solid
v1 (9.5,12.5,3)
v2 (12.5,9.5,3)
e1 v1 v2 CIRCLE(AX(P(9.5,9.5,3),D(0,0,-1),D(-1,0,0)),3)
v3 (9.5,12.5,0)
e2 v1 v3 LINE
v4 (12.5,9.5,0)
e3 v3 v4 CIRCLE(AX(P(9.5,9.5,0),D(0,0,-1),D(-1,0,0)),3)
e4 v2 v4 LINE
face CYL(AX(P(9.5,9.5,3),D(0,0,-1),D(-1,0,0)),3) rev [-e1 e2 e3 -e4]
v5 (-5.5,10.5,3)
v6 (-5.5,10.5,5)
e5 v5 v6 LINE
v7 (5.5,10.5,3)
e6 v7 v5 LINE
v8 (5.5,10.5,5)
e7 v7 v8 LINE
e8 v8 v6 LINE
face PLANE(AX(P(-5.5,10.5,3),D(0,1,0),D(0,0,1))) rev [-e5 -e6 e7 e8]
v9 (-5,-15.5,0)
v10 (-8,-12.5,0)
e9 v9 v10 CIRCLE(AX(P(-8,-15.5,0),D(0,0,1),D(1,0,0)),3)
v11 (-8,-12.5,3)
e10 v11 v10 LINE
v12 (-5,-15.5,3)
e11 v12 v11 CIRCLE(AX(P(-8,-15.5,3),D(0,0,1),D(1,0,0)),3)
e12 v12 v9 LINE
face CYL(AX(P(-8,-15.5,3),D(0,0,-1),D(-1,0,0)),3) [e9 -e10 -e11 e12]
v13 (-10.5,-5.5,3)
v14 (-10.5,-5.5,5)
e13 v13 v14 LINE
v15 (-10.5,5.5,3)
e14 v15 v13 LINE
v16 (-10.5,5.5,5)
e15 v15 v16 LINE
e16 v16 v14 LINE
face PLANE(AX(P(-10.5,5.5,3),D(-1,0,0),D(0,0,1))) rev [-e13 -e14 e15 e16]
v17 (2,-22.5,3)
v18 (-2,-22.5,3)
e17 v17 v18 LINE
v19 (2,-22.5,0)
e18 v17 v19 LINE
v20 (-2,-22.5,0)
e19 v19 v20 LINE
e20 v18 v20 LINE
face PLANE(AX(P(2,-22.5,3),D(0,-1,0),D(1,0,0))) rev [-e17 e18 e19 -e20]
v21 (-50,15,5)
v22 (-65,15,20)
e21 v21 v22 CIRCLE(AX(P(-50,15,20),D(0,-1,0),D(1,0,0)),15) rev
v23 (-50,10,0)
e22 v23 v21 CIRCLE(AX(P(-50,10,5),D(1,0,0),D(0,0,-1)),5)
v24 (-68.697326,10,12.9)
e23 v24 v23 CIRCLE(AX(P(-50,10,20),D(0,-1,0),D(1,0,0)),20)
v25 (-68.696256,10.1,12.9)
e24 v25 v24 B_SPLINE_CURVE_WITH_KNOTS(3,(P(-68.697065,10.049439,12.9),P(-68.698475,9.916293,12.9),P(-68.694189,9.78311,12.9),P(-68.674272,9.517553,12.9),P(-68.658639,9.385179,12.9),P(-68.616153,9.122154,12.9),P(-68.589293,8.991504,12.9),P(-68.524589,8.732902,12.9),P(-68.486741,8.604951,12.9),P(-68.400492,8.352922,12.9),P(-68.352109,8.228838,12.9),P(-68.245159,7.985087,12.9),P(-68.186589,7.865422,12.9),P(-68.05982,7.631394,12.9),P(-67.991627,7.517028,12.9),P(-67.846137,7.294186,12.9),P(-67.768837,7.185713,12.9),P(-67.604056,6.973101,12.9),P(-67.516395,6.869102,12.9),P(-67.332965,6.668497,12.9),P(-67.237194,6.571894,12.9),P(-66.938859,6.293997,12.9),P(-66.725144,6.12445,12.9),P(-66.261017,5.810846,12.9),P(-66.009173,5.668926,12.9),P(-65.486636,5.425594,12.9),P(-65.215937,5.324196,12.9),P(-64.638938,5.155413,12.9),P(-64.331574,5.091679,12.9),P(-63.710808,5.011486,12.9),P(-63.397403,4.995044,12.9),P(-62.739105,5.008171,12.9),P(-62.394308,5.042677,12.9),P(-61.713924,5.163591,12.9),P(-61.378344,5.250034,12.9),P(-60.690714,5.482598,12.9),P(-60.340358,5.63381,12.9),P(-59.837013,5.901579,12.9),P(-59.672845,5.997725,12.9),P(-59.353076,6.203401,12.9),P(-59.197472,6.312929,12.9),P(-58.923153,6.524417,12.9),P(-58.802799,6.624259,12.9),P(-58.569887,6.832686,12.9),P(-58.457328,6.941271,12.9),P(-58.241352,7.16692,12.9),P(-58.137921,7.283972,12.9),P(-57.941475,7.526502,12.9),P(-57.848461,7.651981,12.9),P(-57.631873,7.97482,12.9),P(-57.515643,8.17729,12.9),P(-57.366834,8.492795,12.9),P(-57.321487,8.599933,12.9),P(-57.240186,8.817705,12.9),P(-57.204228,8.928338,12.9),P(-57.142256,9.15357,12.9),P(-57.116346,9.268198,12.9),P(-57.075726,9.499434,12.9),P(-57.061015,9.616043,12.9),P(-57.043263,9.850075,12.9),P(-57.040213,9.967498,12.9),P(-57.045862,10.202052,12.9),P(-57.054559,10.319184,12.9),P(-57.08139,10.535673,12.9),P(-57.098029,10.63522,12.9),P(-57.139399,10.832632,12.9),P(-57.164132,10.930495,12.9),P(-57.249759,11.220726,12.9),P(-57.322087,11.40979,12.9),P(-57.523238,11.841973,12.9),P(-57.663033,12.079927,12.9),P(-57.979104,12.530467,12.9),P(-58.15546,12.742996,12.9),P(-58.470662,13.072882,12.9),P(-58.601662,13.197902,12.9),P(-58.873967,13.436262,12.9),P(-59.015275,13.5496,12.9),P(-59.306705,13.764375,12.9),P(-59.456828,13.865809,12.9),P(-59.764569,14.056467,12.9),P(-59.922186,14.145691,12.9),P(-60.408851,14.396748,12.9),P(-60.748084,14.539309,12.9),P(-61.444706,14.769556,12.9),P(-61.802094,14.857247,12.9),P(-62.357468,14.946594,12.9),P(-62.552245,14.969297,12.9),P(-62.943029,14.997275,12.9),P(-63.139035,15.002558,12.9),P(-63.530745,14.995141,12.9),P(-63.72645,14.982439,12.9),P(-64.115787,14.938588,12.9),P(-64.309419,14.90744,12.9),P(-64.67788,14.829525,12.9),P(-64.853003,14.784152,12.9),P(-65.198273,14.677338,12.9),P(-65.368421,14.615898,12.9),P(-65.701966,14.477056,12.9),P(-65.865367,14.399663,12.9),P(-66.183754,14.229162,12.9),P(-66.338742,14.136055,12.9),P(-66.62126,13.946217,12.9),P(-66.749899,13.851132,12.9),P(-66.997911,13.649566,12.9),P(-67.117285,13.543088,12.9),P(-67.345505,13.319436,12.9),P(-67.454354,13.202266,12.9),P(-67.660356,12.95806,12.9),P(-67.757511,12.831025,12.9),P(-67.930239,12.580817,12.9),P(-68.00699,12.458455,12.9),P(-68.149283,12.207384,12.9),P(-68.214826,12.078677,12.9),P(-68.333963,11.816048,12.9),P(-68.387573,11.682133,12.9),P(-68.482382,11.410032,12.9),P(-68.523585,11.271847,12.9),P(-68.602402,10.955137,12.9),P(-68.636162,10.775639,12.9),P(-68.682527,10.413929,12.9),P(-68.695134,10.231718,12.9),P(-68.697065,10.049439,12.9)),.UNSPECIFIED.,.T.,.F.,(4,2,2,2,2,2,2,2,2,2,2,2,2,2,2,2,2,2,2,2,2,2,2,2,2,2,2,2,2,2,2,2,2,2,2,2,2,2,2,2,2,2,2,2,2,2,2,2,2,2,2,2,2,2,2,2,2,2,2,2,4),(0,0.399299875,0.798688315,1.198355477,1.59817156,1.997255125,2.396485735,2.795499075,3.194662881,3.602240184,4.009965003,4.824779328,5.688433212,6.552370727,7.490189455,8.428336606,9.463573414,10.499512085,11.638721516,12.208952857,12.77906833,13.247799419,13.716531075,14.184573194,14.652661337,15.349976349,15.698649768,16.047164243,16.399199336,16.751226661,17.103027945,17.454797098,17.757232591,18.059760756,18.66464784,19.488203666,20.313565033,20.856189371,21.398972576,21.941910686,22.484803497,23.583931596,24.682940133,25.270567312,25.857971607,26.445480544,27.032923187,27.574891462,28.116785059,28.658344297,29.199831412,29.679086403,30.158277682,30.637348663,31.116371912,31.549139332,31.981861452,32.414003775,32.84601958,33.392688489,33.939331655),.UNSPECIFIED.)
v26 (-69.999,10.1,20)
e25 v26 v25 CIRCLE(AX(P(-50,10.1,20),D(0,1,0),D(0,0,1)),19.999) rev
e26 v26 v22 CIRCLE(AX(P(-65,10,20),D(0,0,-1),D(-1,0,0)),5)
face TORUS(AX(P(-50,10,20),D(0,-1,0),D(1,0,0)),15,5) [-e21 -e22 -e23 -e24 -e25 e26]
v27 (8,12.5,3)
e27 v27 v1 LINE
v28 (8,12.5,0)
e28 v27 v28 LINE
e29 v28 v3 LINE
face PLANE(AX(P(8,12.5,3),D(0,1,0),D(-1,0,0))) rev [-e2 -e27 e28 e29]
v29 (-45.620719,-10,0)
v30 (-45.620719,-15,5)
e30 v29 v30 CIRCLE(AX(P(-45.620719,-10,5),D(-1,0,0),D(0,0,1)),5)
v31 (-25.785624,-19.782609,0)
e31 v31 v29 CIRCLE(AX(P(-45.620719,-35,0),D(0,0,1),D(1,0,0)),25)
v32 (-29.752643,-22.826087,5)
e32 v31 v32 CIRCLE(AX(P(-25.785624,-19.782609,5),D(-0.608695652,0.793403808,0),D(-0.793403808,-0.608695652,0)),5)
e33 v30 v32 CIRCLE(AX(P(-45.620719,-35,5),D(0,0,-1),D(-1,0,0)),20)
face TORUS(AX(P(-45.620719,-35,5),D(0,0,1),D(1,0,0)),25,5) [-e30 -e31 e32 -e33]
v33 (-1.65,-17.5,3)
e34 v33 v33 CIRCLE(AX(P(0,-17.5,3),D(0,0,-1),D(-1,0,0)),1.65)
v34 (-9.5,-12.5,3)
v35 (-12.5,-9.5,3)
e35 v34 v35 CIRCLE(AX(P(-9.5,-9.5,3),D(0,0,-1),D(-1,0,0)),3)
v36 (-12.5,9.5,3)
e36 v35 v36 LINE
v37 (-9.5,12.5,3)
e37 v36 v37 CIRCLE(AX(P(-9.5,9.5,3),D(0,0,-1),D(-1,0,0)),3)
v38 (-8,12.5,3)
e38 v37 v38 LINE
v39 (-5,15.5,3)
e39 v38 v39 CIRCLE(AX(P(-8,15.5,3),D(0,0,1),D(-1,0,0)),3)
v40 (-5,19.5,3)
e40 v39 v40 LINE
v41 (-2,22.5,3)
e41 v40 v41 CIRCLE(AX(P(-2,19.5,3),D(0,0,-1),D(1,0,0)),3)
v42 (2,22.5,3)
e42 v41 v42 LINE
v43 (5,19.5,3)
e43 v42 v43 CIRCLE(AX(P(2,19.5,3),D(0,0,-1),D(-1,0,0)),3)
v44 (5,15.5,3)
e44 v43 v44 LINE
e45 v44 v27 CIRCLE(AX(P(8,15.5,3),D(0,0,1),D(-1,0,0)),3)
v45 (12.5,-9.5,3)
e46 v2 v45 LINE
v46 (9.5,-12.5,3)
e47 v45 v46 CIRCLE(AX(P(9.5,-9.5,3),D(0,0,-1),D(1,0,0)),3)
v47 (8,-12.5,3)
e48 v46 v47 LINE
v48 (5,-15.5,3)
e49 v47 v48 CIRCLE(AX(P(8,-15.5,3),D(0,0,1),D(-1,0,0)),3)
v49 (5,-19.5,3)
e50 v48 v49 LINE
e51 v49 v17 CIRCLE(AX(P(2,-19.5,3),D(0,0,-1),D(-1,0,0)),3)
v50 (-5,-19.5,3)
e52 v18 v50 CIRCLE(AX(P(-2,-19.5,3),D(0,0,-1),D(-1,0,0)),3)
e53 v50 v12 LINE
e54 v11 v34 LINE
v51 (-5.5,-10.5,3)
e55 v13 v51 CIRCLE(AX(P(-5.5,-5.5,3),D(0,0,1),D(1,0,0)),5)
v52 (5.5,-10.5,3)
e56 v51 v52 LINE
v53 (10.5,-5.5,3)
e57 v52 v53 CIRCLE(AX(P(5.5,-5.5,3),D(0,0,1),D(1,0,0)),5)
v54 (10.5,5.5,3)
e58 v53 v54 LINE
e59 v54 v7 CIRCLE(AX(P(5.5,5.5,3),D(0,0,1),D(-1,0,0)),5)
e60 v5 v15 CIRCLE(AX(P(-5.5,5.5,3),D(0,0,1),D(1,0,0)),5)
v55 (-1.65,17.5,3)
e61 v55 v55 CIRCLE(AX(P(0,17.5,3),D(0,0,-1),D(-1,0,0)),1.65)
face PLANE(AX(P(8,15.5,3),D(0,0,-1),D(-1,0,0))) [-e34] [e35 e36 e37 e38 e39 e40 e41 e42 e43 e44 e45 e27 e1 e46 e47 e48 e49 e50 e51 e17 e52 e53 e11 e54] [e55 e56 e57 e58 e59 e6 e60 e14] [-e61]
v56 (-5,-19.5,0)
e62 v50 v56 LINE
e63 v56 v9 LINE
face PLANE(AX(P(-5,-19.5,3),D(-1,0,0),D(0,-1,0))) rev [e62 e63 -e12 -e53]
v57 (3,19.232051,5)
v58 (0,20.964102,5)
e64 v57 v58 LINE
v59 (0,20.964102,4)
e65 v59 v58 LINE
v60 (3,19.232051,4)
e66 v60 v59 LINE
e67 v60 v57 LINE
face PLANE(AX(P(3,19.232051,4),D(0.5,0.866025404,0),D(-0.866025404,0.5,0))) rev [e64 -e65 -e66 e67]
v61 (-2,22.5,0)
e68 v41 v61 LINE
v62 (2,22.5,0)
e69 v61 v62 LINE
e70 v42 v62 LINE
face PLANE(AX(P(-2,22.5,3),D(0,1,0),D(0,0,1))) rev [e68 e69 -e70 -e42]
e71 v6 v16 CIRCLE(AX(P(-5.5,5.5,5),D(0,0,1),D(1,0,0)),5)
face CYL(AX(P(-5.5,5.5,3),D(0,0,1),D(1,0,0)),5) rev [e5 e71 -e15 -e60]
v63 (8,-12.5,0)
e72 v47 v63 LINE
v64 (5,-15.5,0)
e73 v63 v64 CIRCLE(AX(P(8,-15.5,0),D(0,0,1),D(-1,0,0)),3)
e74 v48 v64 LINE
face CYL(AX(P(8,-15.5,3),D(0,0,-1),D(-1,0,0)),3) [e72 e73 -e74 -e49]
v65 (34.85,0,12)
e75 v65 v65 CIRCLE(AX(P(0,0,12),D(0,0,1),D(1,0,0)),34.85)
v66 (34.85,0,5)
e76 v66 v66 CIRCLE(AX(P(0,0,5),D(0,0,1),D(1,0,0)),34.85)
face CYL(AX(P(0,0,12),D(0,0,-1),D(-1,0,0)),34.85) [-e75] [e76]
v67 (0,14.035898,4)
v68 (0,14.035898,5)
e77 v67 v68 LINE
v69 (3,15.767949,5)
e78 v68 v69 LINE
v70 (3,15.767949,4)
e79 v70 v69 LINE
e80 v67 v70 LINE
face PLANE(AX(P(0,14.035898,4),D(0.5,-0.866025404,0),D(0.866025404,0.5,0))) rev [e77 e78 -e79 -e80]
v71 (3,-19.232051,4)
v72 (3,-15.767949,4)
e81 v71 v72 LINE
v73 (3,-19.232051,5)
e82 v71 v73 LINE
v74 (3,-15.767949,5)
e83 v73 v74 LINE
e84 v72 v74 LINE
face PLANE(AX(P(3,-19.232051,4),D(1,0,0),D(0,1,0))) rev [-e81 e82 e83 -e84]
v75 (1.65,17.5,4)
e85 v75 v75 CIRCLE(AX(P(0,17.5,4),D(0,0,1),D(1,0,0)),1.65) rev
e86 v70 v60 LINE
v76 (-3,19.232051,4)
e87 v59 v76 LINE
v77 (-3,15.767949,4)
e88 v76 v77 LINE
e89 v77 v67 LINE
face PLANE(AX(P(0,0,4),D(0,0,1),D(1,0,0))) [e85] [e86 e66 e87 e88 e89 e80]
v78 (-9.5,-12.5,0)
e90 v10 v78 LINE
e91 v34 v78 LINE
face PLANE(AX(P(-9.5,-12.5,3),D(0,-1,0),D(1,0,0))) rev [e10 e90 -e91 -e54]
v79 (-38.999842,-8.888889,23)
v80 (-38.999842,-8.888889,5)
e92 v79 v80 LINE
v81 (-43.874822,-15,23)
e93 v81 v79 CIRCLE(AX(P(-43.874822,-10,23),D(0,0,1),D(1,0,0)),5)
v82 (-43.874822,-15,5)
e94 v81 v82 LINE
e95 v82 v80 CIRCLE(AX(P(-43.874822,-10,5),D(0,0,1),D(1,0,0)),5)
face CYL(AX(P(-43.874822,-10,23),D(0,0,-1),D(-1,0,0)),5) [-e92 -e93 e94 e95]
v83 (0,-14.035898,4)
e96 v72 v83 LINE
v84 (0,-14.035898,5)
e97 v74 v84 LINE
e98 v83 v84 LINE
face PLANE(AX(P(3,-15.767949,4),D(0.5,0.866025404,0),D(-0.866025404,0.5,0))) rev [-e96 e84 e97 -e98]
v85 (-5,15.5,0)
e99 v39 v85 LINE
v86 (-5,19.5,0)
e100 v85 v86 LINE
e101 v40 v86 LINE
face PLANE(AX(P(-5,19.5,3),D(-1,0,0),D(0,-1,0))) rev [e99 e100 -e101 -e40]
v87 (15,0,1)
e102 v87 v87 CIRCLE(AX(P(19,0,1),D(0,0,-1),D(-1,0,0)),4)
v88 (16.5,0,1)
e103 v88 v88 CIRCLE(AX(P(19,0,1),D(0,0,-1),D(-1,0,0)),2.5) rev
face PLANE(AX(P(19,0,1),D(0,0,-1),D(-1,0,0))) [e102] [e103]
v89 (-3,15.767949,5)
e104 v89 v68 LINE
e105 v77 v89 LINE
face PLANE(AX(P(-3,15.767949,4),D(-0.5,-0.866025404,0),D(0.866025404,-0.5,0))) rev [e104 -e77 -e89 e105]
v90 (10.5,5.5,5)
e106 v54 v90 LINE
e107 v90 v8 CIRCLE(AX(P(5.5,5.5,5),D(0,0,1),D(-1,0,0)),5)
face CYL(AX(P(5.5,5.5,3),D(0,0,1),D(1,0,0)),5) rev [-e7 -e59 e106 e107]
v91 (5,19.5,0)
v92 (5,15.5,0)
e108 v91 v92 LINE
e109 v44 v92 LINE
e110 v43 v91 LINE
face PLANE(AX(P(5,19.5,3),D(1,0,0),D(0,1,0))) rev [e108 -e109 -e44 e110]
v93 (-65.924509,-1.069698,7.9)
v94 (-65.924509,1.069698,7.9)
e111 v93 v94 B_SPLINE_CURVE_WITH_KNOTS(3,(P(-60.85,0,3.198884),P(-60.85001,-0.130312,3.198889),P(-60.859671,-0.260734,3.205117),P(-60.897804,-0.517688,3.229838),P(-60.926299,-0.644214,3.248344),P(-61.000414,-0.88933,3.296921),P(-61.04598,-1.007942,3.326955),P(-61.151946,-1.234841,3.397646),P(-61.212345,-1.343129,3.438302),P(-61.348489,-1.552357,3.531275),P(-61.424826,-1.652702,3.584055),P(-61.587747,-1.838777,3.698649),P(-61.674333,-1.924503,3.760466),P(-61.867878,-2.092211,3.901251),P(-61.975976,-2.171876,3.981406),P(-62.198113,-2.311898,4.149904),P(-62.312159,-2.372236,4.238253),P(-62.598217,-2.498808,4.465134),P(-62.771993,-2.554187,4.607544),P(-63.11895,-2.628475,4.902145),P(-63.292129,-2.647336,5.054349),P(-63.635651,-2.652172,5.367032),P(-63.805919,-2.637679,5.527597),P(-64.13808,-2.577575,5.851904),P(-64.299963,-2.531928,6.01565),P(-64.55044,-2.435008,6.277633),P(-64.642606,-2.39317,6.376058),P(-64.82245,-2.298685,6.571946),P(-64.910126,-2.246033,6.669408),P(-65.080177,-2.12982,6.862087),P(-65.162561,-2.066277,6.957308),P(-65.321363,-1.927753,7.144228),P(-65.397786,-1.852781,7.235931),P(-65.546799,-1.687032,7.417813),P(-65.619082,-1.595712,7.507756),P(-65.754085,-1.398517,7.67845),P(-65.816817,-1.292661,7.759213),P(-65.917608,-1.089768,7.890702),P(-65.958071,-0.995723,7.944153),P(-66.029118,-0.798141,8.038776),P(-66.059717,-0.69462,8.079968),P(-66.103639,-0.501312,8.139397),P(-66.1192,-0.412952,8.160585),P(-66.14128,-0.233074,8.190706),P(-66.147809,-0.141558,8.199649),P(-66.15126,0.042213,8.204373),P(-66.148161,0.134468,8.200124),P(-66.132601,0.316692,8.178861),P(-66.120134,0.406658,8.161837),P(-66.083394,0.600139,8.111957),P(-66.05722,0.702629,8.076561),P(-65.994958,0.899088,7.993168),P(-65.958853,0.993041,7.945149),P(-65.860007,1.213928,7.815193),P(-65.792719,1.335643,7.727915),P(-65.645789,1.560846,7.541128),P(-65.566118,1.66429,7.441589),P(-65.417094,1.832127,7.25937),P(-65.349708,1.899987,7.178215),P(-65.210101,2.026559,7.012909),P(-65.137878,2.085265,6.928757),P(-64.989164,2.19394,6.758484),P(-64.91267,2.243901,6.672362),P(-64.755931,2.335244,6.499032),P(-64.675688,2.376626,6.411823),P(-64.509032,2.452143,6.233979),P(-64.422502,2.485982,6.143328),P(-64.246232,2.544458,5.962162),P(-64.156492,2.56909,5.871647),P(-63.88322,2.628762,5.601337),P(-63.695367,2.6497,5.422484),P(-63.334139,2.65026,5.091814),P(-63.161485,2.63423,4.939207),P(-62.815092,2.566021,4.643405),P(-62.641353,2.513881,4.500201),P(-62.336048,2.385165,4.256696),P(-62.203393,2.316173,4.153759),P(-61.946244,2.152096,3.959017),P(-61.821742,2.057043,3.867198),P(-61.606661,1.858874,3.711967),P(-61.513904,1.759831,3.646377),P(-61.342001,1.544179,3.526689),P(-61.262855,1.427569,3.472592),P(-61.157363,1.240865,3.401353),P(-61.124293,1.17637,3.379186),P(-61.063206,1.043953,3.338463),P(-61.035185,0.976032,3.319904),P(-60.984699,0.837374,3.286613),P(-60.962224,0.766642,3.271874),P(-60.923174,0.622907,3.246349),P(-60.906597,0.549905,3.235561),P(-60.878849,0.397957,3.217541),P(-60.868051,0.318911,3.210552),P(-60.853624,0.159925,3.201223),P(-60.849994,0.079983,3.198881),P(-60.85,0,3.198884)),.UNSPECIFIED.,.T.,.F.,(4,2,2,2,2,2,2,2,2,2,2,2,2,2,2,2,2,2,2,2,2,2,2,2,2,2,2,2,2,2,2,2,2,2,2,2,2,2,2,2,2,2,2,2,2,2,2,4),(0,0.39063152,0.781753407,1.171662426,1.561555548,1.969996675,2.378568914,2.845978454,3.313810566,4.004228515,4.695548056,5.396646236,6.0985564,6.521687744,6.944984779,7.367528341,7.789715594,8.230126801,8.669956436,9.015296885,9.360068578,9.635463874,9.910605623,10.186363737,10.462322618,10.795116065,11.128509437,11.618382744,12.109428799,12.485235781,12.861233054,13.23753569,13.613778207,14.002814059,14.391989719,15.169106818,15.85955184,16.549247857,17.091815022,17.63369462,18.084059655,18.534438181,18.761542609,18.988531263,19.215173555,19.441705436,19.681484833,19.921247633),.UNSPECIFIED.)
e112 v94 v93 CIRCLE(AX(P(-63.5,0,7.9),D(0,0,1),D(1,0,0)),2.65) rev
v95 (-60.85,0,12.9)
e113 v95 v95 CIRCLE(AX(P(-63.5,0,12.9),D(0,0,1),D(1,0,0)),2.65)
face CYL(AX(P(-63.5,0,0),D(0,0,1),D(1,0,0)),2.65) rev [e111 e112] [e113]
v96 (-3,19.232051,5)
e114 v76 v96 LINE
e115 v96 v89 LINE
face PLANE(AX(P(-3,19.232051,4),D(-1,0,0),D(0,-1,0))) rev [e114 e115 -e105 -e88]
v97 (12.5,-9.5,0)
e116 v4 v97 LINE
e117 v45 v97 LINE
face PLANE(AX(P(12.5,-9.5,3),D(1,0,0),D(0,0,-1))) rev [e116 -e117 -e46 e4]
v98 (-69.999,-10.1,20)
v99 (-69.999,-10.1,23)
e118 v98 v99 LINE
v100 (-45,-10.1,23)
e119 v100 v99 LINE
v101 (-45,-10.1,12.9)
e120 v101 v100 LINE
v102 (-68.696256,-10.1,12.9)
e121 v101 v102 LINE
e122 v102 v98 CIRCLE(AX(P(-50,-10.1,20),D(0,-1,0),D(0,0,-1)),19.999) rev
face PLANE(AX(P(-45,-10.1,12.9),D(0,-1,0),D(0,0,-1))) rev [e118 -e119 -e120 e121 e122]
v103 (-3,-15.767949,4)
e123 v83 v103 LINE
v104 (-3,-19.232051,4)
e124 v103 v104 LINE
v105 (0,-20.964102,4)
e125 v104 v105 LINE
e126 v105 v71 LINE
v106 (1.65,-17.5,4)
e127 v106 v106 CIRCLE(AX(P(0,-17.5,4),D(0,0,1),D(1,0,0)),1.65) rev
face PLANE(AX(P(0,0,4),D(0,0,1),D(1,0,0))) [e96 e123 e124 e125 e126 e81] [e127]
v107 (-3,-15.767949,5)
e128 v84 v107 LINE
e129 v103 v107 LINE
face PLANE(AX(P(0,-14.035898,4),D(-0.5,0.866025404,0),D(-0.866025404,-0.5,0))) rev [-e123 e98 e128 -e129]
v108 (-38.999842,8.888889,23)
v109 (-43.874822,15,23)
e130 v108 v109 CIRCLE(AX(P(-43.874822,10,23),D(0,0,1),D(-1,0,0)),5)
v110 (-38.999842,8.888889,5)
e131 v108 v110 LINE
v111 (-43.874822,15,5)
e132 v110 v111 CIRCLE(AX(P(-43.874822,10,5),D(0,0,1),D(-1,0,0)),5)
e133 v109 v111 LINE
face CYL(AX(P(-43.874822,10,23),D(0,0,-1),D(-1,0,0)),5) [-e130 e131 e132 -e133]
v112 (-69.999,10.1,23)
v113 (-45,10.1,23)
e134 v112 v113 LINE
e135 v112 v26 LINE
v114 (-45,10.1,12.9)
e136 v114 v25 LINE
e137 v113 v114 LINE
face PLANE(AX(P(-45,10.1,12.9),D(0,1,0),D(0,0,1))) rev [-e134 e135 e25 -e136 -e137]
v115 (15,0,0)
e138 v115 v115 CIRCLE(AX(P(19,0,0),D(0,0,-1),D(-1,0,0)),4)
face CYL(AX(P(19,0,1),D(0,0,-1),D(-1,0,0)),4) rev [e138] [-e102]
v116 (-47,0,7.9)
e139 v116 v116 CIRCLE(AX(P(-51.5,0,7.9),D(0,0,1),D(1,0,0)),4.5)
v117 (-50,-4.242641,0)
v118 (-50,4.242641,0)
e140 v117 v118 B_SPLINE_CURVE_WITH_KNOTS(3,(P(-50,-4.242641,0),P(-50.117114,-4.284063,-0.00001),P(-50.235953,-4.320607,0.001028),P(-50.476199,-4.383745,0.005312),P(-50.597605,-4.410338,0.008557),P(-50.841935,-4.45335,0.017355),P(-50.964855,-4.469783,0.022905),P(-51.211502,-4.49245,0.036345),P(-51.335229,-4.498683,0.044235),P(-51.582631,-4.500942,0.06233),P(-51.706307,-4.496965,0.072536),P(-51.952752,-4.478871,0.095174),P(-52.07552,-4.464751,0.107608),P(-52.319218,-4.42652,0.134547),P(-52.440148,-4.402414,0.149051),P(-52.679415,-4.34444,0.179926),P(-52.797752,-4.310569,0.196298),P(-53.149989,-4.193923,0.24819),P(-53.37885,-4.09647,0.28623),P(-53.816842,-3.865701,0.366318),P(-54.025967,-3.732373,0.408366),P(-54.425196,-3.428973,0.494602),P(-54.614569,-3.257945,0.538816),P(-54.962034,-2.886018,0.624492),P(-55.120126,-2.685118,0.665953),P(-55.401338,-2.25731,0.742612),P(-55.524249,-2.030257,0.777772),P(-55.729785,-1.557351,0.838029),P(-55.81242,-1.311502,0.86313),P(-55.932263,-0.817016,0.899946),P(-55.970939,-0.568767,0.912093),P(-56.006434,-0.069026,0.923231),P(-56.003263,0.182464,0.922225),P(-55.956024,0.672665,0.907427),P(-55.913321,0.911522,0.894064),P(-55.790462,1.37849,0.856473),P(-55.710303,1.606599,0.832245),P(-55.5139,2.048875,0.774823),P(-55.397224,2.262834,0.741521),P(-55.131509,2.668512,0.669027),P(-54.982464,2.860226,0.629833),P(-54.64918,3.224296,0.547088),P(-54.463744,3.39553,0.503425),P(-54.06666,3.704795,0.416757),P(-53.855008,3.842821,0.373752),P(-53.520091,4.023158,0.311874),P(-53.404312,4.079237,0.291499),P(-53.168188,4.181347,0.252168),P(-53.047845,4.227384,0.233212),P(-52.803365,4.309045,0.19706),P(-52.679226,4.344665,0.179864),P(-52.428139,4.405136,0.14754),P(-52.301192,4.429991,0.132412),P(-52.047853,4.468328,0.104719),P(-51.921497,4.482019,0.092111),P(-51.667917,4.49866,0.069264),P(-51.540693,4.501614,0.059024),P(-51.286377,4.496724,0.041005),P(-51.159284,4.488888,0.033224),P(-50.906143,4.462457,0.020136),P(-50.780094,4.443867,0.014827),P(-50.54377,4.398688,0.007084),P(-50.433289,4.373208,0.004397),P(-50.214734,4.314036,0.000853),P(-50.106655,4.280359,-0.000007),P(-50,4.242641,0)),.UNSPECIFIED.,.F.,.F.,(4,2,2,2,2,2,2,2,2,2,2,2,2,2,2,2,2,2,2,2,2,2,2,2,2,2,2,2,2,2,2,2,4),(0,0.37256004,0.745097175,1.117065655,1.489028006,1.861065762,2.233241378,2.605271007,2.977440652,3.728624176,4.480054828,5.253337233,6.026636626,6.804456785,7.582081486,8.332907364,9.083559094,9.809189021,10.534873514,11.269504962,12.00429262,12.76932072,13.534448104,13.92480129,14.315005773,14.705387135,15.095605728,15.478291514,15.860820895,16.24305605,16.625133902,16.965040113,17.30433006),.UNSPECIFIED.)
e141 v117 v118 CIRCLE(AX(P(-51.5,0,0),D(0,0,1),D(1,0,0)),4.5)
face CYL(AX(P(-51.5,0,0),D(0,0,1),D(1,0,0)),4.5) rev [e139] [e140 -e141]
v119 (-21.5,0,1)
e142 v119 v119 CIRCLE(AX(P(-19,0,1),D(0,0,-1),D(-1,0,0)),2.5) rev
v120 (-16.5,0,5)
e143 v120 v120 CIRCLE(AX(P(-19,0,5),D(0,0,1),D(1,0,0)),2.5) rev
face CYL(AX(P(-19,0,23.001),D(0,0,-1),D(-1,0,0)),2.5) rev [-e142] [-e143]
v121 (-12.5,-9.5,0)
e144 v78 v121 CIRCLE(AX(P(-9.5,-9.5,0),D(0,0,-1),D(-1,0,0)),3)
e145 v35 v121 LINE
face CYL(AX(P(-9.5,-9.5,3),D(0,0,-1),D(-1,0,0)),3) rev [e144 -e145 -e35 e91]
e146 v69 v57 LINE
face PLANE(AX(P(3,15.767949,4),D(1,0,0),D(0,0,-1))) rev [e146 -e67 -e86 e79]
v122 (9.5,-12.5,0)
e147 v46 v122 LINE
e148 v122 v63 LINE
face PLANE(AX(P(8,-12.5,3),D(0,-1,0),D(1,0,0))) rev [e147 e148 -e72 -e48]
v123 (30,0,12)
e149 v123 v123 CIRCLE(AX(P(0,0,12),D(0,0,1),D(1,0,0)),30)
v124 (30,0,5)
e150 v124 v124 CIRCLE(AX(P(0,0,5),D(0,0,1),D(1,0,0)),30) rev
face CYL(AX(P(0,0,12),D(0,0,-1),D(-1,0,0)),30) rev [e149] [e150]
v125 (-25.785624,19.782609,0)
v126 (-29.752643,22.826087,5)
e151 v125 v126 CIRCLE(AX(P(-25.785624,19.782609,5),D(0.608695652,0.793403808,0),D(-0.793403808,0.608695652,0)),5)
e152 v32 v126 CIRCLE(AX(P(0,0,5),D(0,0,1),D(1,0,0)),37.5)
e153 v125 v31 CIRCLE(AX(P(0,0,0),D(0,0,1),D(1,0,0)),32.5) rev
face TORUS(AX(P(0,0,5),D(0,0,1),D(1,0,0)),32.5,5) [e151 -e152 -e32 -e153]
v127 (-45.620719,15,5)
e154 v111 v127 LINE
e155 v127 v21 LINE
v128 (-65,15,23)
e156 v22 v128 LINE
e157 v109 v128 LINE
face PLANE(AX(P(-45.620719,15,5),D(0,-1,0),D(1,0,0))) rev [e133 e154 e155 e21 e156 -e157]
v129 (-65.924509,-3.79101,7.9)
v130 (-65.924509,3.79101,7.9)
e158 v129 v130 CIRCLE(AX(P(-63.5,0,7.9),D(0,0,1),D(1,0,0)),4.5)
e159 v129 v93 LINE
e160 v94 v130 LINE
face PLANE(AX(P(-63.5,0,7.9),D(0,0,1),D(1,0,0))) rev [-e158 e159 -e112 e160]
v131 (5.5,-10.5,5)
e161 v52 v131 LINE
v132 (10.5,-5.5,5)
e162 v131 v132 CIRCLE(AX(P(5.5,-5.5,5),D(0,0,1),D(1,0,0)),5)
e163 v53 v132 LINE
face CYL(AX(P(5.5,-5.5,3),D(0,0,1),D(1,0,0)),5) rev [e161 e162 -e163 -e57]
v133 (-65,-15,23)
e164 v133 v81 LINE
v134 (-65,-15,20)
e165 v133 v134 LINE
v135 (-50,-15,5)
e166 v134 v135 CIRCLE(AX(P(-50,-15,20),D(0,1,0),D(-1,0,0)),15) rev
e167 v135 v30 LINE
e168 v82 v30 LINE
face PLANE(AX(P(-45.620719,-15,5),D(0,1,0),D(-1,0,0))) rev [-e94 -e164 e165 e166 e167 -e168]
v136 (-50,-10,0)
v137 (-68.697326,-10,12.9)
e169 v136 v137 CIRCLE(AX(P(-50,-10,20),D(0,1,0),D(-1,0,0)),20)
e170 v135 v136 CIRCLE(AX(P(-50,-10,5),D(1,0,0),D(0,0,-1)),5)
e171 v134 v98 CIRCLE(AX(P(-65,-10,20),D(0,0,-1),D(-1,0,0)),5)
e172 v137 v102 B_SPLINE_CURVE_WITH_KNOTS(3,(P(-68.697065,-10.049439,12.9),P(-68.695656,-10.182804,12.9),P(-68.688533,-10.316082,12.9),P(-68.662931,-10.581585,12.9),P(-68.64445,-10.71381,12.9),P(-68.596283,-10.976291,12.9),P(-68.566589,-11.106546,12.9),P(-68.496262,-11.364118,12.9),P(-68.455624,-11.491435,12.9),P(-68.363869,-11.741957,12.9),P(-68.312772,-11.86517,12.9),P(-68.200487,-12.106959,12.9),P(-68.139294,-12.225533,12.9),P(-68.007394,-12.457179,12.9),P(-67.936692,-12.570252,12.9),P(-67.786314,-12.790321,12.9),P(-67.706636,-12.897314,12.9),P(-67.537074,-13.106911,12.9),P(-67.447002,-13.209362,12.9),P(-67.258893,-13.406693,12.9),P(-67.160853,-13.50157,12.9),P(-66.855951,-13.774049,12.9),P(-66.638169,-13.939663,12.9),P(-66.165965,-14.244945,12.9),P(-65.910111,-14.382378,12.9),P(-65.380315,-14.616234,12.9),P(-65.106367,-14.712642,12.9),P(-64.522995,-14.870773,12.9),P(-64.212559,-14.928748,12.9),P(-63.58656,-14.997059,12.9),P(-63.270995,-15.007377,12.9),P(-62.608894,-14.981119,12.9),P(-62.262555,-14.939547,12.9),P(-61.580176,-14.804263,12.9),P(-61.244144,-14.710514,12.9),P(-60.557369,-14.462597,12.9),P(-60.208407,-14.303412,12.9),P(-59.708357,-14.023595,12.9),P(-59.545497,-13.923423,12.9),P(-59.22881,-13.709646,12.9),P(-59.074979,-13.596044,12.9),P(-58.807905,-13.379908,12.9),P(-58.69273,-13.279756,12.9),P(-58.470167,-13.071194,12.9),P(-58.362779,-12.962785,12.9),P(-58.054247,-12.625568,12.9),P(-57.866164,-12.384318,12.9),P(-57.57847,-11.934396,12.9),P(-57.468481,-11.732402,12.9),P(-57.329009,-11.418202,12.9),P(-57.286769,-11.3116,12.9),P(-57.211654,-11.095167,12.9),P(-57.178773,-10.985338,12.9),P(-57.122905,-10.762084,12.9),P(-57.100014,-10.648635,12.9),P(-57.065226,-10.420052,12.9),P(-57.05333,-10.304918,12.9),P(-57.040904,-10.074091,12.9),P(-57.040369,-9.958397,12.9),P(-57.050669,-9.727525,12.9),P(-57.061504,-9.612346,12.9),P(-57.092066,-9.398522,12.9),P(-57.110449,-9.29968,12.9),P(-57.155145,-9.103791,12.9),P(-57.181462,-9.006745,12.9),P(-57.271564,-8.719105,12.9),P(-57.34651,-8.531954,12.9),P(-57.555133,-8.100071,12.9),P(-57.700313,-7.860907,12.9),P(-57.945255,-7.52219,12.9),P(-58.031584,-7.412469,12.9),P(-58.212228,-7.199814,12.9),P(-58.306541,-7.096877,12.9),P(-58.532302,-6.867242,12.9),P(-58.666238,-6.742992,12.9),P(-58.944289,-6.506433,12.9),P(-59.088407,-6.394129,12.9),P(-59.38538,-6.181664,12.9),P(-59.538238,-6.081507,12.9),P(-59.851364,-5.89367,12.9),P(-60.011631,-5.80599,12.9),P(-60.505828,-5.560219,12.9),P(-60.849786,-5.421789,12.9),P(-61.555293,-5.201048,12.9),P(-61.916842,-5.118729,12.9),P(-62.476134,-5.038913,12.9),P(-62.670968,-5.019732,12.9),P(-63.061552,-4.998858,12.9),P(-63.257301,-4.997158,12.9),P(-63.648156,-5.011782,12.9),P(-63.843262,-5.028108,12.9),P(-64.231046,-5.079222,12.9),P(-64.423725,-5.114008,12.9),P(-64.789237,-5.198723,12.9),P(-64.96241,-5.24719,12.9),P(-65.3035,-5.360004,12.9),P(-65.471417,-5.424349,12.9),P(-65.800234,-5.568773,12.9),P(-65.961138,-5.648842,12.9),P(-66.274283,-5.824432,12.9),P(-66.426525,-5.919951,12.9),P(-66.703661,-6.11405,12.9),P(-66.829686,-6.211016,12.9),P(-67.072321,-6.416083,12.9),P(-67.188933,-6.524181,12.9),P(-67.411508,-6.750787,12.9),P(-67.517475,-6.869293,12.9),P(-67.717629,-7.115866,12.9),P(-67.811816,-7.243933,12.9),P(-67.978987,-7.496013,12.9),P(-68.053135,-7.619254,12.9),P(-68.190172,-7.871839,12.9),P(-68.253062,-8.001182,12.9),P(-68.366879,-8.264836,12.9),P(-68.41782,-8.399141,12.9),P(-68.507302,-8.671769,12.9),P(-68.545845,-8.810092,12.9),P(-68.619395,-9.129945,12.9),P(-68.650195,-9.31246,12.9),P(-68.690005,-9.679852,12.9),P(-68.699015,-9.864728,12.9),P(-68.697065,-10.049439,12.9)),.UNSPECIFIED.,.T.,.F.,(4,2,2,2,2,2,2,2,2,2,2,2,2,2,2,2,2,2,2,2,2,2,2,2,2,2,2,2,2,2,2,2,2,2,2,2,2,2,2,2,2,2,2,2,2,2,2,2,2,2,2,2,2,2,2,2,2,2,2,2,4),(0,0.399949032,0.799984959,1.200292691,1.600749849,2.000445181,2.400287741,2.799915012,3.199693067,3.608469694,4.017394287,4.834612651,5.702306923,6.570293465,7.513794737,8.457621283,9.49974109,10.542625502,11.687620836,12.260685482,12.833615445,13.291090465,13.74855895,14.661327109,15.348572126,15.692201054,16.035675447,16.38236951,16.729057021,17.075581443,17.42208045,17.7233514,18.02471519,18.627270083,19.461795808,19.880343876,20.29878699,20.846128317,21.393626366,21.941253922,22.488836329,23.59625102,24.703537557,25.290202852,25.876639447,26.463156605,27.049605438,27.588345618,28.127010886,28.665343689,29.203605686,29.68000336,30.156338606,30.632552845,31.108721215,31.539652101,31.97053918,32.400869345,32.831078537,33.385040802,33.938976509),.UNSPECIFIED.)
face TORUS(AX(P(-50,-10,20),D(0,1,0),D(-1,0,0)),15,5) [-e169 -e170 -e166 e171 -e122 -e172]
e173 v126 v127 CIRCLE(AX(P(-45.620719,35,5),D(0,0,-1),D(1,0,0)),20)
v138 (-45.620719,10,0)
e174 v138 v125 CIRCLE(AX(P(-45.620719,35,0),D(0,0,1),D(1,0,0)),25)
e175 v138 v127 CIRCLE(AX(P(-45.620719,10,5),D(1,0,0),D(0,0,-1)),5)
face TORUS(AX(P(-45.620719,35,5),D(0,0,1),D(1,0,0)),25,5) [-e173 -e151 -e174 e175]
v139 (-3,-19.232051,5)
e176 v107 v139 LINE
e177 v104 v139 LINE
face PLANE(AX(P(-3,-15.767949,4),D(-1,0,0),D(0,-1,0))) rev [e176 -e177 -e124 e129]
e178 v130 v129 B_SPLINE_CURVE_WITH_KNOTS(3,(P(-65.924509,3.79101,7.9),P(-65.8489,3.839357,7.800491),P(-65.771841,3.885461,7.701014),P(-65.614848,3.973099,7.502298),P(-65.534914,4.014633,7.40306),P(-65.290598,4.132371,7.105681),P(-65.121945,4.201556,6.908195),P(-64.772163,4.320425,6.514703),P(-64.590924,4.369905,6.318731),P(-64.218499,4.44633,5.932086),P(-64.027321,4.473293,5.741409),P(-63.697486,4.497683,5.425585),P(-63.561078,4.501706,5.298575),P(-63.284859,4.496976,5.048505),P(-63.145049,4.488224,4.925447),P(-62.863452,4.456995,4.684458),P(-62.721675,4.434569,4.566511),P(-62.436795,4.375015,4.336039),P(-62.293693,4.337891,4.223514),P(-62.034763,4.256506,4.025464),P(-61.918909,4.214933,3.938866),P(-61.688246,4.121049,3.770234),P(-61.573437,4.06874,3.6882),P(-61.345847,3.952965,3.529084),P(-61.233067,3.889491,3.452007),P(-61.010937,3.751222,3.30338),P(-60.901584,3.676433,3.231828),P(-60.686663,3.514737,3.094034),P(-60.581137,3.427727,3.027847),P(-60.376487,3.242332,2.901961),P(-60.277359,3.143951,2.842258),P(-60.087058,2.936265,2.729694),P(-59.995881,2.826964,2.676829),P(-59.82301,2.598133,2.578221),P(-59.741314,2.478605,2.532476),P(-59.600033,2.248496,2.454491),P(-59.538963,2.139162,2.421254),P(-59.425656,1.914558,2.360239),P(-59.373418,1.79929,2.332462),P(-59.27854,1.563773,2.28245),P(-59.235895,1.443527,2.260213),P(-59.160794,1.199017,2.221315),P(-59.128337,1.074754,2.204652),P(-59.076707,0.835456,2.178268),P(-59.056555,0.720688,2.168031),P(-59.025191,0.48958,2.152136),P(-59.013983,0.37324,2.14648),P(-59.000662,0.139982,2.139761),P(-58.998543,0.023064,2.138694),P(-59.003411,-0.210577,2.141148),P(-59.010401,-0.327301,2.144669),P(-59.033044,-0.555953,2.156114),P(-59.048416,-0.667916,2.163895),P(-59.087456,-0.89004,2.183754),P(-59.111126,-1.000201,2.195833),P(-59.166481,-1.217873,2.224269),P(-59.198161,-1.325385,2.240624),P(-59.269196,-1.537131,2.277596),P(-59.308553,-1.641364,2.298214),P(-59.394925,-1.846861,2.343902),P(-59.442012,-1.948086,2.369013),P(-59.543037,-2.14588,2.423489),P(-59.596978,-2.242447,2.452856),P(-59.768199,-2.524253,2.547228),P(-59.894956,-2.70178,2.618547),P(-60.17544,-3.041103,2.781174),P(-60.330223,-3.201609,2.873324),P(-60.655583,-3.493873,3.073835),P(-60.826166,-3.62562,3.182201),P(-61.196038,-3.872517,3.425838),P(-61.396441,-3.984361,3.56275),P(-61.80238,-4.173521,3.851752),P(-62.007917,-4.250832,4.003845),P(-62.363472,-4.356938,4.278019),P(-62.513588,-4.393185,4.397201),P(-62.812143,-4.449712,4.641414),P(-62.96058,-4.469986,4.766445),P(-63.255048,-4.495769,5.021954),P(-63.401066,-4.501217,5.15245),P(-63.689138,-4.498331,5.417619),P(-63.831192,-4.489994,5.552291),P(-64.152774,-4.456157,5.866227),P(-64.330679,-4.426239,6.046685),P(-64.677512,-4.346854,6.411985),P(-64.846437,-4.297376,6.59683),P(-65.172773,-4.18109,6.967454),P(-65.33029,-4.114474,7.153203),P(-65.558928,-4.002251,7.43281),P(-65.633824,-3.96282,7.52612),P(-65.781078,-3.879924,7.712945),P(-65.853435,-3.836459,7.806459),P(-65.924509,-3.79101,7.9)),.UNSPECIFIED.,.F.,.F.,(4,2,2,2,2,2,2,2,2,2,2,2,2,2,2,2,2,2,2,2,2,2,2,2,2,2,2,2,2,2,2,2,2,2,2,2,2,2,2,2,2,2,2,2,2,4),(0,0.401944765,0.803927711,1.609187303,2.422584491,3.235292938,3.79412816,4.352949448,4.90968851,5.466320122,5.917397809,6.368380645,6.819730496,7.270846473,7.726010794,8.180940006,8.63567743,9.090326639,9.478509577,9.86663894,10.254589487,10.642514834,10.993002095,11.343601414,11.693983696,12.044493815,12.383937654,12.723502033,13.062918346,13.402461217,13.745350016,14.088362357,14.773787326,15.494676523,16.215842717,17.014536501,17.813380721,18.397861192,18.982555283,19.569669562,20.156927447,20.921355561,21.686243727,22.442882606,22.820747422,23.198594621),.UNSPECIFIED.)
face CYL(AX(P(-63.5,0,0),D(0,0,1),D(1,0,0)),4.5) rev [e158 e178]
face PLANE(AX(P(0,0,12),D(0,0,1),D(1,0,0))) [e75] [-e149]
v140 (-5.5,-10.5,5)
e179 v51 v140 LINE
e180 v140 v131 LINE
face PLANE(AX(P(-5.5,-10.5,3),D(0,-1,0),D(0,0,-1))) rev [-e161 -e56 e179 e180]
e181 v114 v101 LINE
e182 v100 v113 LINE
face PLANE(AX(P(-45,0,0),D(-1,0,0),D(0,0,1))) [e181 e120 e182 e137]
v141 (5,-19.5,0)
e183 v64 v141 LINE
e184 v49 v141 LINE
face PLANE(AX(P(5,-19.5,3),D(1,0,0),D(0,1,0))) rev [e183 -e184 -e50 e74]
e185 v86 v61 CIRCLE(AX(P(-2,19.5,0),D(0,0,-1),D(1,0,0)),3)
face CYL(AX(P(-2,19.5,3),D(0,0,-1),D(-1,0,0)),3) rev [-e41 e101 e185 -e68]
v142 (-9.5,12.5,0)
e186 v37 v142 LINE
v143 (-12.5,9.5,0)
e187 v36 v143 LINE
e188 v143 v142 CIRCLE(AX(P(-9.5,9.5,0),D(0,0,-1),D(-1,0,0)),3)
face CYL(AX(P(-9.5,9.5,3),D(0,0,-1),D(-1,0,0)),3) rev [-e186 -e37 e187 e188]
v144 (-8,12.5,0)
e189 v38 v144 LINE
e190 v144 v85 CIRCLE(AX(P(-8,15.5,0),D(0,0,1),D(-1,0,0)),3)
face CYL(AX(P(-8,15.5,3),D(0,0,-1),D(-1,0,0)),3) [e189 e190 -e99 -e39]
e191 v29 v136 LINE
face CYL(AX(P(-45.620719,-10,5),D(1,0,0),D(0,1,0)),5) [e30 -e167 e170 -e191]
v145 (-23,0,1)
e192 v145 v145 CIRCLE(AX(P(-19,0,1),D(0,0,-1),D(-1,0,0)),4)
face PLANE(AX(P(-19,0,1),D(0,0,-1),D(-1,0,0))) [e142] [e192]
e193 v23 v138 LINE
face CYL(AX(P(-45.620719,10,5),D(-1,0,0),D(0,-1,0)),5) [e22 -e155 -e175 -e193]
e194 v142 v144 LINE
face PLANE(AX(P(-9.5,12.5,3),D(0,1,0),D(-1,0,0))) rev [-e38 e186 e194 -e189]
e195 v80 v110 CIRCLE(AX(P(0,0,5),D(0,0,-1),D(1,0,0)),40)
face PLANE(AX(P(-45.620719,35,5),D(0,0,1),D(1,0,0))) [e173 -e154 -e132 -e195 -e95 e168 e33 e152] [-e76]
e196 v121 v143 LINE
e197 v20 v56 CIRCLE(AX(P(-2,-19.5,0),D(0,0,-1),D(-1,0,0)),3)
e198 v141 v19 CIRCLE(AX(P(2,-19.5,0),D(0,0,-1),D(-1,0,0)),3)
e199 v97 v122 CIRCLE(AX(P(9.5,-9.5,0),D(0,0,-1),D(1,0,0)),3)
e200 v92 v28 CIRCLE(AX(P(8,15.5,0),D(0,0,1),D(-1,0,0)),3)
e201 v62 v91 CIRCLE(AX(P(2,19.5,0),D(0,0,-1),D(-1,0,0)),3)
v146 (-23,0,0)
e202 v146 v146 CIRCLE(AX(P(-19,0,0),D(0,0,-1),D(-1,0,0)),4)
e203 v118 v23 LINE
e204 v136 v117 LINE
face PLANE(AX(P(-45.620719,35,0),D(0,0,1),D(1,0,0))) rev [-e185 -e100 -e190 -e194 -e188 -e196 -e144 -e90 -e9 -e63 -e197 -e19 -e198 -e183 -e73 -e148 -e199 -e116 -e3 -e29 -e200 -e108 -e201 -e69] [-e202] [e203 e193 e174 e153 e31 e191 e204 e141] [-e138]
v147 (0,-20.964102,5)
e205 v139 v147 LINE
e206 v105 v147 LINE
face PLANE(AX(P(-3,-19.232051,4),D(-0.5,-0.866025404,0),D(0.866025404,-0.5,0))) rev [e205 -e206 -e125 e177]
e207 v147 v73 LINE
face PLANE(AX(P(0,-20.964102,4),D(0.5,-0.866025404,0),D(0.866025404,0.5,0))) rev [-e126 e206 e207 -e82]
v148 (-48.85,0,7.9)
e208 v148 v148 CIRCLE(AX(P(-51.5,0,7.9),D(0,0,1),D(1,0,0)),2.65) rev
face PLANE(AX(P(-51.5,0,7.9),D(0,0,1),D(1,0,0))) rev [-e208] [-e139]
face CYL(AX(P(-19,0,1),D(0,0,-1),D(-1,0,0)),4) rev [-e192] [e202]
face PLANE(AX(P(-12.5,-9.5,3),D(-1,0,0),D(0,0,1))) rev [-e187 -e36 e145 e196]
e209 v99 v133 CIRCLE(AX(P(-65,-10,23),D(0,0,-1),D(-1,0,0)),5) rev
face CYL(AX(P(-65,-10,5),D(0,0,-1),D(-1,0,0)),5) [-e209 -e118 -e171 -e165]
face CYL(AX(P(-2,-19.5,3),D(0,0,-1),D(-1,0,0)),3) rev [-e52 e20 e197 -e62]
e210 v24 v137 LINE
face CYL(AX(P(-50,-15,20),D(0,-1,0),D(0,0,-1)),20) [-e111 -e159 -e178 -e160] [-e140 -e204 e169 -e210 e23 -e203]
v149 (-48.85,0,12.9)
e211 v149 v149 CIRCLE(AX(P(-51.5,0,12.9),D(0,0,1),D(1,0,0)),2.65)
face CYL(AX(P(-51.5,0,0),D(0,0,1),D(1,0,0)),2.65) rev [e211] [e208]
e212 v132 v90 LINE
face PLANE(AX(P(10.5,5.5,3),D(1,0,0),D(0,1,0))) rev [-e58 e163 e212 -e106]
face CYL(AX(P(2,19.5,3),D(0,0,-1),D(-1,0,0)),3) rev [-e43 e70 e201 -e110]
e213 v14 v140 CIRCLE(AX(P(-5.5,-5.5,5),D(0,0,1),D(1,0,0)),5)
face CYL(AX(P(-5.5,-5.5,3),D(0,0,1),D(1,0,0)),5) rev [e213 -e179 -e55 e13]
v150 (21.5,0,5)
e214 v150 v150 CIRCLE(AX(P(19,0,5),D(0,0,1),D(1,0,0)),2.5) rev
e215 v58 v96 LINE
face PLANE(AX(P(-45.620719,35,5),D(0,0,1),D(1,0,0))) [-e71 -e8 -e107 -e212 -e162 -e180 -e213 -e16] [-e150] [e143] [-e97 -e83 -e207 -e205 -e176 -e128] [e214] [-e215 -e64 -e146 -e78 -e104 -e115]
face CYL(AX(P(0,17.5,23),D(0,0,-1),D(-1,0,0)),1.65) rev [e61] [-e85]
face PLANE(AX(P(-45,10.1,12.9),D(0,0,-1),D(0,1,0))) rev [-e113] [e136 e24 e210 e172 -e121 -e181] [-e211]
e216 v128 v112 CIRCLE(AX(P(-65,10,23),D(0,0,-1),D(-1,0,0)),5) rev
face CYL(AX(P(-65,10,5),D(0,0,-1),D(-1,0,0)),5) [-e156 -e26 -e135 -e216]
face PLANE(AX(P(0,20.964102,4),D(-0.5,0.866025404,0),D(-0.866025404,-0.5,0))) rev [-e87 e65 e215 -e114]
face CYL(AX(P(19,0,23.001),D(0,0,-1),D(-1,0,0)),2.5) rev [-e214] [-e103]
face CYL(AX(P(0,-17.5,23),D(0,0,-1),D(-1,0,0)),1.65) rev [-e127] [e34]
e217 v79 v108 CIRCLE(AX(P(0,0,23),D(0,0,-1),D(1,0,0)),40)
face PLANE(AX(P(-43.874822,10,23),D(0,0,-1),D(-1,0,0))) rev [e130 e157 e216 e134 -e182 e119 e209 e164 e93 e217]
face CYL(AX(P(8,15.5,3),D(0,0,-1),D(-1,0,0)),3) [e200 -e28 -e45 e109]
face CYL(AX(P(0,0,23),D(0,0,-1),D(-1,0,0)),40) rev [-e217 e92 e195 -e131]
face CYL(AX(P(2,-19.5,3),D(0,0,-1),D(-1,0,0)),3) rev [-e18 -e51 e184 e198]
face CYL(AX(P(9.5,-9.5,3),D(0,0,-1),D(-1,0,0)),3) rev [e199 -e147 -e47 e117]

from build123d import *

# Parameters (mm, degrees)
BOSS_EXTRU_1_DEPTH       = 5
ESQUISSE6_R              = 34.85
ESQUISSE6_R_2            = 30
BOSS_EXTRU_6_DEPTH       = 7
BOSS_EXTRU_9_DEPTH       = 18
ENL_V_MAT_EXTRU_10_REACH = 84.676
ESQUISSE21_R             = 2.5
ESQUISSE22_R             = 4
ENL_V_MAT_EXTRU_11_DEPTH = 1
CONG_1_R                 = 20
CONG_2_R                 = 5
ESQUISSE11_W             = 20.2
ESQUISSE11_H             = 20.2
ENL_V_MAT_EXTRU_2_DEPTH  = 25
ESQUISSE12_R             = 2.65
ENL_V_MAT_EXTRU_3_DEPTH  = 81.451974996
ENL_V_START              = -5
ESQUISSE13_R             = 4.5
ENL_V_MAT_EXTRU_4_DEPTH  = 76.451974996
ENL_V_MAT_EXTRU_5_DEPTH  = 2
ENL_V_MAT_EXTRU_7_DEPTH  = 3
ESQUISSE19_R             = 1.65
ENL_V_MAT_EXTRU_8_DEPTH  = 82.890843677
ENL_V_MAT_EXTRU_9_DEPTH  = 1


with BuildPart() as part:
    # Esquisse1 → Boss.-Extru.1 (new body)
    with BuildSketch(Plane.XY):
        with BuildLine():
            Line((-45.620718977, 15), (-70, 15))
            Line((-70, 15), (-70, -15))
            Line((-70, -15), (-45.620718977, -15))
            ThreePointArc((-45.620718977, -15), (-36.774201608, -17.062911874), (-29.752642811, -22.826086957))
            ThreePointArc((-29.752642811, -22.826086957), (37.5, 0), (-29.752642811, 22.826086957))
            ThreePointArc((-29.752642811, 22.826086957), (-36.774201608, 17.062911874), (-45.620718977, 15))
        make_face()
    extrude(amount=BOSS_EXTRU_1_DEPTH)

    # Esquisse6 → Boss.-Extru.6 (add)
    with BuildSketch(Plane.XY.offset(5)):
        Circle(ESQUISSE6_R)
        Circle(ESQUISSE6_R_2, mode=Mode.SUBTRACT)
    extrude(amount=BOSS_EXTRU_6_DEPTH)

    # Esquisse8 → Boss.-Extru.9 (add)
    with BuildSketch(Plane.XY.offset(5)):
        with BuildLine():
            Line((-70, -15), (-70, 15))
            Line((-70, 15), (-43.874821937, 15))
            ThreePointArc((-43.874821937, 15), (-39.966142137, 13.118047822), (-38.999841722, 8.888888889))
            ThreePointArc((-38.999841722, 8.888888889), (-40, 0), (-38.999841722, -8.888888889))
            ThreePointArc((-38.999841722, -8.888888889), (-39.966142137, -13.118047822), (-43.874821937, -15))
            Line((-43.874821937, -15), (-70, -15))
        make_face()
    extrude(amount=BOSS_EXTRU_9_DEPTH)

    # Esquisse21 → Enlèv. mat.-Extru.10 (cut, up to next)
    with BuildSketch(Plane(origin=(0, 0, 0), x_dir=(-1, 0, 0), z_dir=(0, 0, -1)), mode=Mode.PRIVATE) as enl_v_mat_extru_10_sk1:
        with Locations((-19, 0)):
            Circle(ESQUISSE21_R)
    enl_v_mat_extru_10_tool1 = extrude(enl_v_mat_extru_10_sk1.sketch, amount=-ENL_V_MAT_EXTRU_10_REACH, mode=Mode.PRIVATE) & part.part
    # Esquisse21 → Enlèv. mat.-Extru.10 (cut, up to next)
    with BuildSketch(Plane(origin=(0, 0, 0), x_dir=(-1, 0, 0), z_dir=(0, 0, -1)), mode=Mode.PRIVATE) as enl_v_mat_extru_10_sk2:
        with Locations((19, 0)):
            Circle(ESQUISSE21_R)
    enl_v_mat_extru_10_tool2 = extrude(enl_v_mat_extru_10_sk2.sketch, amount=-ENL_V_MAT_EXTRU_10_REACH, mode=Mode.PRIVATE) & part.part
    add(enl_v_mat_extru_10_tool1.solids().sort_by_distance((19, 0, 0))[0], mode=Mode.SUBTRACT)
    add(enl_v_mat_extru_10_tool2.solids().sort_by_distance((-19, 0, 0))[0], mode=Mode.SUBTRACT)

    # Esquisse22 → Enlèv. mat.-Extru.11 (cut)
    with BuildSketch(Plane(origin=(0, 0, 0), x_dir=(-1, 0, 0), z_dir=(0, 0, -1))):
        with Locations((-19, 0)):
            Circle(ESQUISSE22_R)
        with Locations((19, 0)):
            Circle(ESQUISSE22_R)
    extrude(amount=-ENL_V_MAT_EXTRU_11_DEPTH, mode=Mode.SUBTRACT)

    # Congé1
    cong_1_edges = [part.edges().sort_by_distance(p)[0] for p in [
        (-70, 0, 0),
    ]]
    fillet(cong_1_edges, radius=CONG_1_R)

    # Congé2
    cong_2_edges = [part.edges().sort_by_distance(p)[0] for p in [
        (-47.810359489, -15, 0),
        (-36.774201608, -17.062911874, 0),
        (37.5, 0, 0),
        (-36.774201608, 17.062911874, 0),
        (-47.810359489, 15, 0),
        (-64.142135624, 15, 5.857864376),
        (-64.142135624, -15, 5.857864376),
        (-70, -15, 21.5),
        (-70, 15, 21.5),
    ]]
    fillet(cong_2_edges, radius=CONG_2_R - 0.0001)  # a hair under: the kernel refuses the full size

    # Esquisse11 → Enlèv. mat.-Extru.2 (cut)
    with BuildSketch(Plane.ZY.offset(70)):
        with Locations((23, 0)):
            Rectangle(ESQUISSE11_W, ESQUISSE11_H)
    extrude(amount=-ENL_V_MAT_EXTRU_2_DEPTH, mode=Mode.SUBTRACT)

    # Esquisse12 → Enlèv. mat.-Extru.3 (cut, through all)
    with BuildSketch(Plane.XY.offset(12.9)):
        with Locations((-51.5, 0)):
            Circle(ESQUISSE12_R)
        with Locations((-63.5, 0)):
            Circle(ESQUISSE12_R)
    extrude(amount=-ENL_V_MAT_EXTRU_3_DEPTH, mode=Mode.SUBTRACT)

    # Esquisse13 → Enlèv. mat.-Extru.4 (cut, through all)
    with BuildSketch(Plane.XY.offset(12.9).offset(ENL_V_START)):
        with Locations((-51.5, 0)):
            Circle(ESQUISSE13_R)
        with Locations((-63.5, 0)):
            Circle(ESQUISSE13_R)
    extrude(amount=-ENL_V_MAT_EXTRU_4_DEPTH, mode=Mode.SUBTRACT)

    # Esquisse14 → Enlèv. mat.-Extru.5 (cut)
    with BuildSketch(Plane.XY.offset(5)):
        with BuildLine():
            Line((-5.5, 10.5), (5.5, 10.5))
            ThreePointArc((5.5, 10.5), (9.035533906, 9.035533906), (10.5, 5.5))
            Line((10.5, 5.5), (10.5, -5.5))
            ThreePointArc((10.5, -5.5), (9.035533906, -9.035533906), (5.5, -10.5))
            Line((5.5, -10.5), (-5.5, -10.5))
            ThreePointArc((-5.5, -10.5), (-9.035533906, -9.035533906), (-10.5, -5.5))
            Line((-10.5, -5.5), (-10.5, 5.5))
            ThreePointArc((-10.5, 5.5), (-9.035533906, 9.035533906), (-5.5, 10.5))
        make_face()
    extrude(amount=-ENL_V_MAT_EXTRU_5_DEPTH, mode=Mode.SUBTRACT)

    # Esquisse17 → Enlèv. mat.-Extru.7 (cut)
    with BuildSketch(Plane(origin=(0, 0, 0), x_dir=(-1, 0, 0), z_dir=(0, 0, -1))):
        with BuildLine():
            Line((-5, -19.5), (-5, -15.5))
            ThreePointArc((-5, -15.5), (-5.878679656, -13.378679656), (-8, -12.5))
            Line((-8, -12.5), (-9.5, -12.5))
            ThreePointArc((-9.5, -12.5), (-11.621320344, -11.621320344), (-12.5, -9.5))
            Line((-12.5, -9.5), (-12.5, 9.5))
            ThreePointArc((-12.5, 9.5), (-11.621320344, 11.621320344), (-9.5, 12.5))
            Line((-9.5, 12.5), (-8, 12.5))
            ThreePointArc((-8, 12.5), (-5.878679656, 13.378679656), (-5, 15.5))
            Line((-5, 15.5), (-5, 19.5))
            ThreePointArc((-5, 19.5), (-4.121320344, 21.621320344), (-2, 22.5))
            Line((-2, 22.5), (2, 22.5))
            ThreePointArc((2, 22.5), (4.121320344, 21.621320344), (5, 19.5))
            Line((5, 19.5), (5, 15.5))
            ThreePointArc((5, 15.5), (5.878679656, 13.378679656), (8, 12.5))
            Line((8, 12.5), (9.5, 12.5))
            ThreePointArc((9.5, 12.5), (11.621320344, 11.621320344), (12.5, 9.5))
            Line((12.5, 9.5), (12.5, -9.5))
            ThreePointArc((12.5, -9.5), (11.621320344, -11.621320344), (9.5, -12.5))
            Line((9.5, -12.5), (8, -12.5))
            ThreePointArc((8, -12.5), (5.878679656, -13.378679656), (5, -15.5))
            Line((5, -15.5), (5, -19.5))
            ThreePointArc((5, -19.5), (4.121320344, -21.621320344), (2, -22.5))
            Line((2, -22.5), (-2, -22.5))
            ThreePointArc((-2, -22.5), (-4.121320344, -21.621320344), (-5, -19.5))
        make_face()
    extrude(amount=-ENL_V_MAT_EXTRU_7_DEPTH, mode=Mode.SUBTRACT)

    # Esquisse19 → Enlèv. mat.-Extru.8 (cut, through all)
    with BuildSketch(Plane(origin=(0, 0, 3), x_dir=(-1, 0, 0), z_dir=(0, 0, -1))):
        with Locations((0, 17.5)):
            Circle(ESQUISSE19_R)
        with Locations((0, -17.5)):
            Circle(ESQUISSE19_R)
    extrude(amount=-ENL_V_MAT_EXTRU_8_DEPTH, mode=Mode.SUBTRACT)

    # Esquisse20 → Enlèv. mat.-Extru.9 (cut)
    with BuildSketch(Plane.XY.offset(5)):
        Polygon((0, -14.035898385), (-3, -15.767949192), (-3, -19.232050808), (0, -20.964101615), (3, -19.232050808), (3, -15.767949192), align=None)
        Polygon((0, 14.035898385), (3, 15.767949192), (3, 19.232050808), (0, 20.964101615), (-3, 19.232050808), (-3, 15.767949192), align=None)
    extrude(amount=-ENL_V_MAT_EXTRU_9_DEPTH, mode=Mode.SUBTRACT)


solid = part.part
